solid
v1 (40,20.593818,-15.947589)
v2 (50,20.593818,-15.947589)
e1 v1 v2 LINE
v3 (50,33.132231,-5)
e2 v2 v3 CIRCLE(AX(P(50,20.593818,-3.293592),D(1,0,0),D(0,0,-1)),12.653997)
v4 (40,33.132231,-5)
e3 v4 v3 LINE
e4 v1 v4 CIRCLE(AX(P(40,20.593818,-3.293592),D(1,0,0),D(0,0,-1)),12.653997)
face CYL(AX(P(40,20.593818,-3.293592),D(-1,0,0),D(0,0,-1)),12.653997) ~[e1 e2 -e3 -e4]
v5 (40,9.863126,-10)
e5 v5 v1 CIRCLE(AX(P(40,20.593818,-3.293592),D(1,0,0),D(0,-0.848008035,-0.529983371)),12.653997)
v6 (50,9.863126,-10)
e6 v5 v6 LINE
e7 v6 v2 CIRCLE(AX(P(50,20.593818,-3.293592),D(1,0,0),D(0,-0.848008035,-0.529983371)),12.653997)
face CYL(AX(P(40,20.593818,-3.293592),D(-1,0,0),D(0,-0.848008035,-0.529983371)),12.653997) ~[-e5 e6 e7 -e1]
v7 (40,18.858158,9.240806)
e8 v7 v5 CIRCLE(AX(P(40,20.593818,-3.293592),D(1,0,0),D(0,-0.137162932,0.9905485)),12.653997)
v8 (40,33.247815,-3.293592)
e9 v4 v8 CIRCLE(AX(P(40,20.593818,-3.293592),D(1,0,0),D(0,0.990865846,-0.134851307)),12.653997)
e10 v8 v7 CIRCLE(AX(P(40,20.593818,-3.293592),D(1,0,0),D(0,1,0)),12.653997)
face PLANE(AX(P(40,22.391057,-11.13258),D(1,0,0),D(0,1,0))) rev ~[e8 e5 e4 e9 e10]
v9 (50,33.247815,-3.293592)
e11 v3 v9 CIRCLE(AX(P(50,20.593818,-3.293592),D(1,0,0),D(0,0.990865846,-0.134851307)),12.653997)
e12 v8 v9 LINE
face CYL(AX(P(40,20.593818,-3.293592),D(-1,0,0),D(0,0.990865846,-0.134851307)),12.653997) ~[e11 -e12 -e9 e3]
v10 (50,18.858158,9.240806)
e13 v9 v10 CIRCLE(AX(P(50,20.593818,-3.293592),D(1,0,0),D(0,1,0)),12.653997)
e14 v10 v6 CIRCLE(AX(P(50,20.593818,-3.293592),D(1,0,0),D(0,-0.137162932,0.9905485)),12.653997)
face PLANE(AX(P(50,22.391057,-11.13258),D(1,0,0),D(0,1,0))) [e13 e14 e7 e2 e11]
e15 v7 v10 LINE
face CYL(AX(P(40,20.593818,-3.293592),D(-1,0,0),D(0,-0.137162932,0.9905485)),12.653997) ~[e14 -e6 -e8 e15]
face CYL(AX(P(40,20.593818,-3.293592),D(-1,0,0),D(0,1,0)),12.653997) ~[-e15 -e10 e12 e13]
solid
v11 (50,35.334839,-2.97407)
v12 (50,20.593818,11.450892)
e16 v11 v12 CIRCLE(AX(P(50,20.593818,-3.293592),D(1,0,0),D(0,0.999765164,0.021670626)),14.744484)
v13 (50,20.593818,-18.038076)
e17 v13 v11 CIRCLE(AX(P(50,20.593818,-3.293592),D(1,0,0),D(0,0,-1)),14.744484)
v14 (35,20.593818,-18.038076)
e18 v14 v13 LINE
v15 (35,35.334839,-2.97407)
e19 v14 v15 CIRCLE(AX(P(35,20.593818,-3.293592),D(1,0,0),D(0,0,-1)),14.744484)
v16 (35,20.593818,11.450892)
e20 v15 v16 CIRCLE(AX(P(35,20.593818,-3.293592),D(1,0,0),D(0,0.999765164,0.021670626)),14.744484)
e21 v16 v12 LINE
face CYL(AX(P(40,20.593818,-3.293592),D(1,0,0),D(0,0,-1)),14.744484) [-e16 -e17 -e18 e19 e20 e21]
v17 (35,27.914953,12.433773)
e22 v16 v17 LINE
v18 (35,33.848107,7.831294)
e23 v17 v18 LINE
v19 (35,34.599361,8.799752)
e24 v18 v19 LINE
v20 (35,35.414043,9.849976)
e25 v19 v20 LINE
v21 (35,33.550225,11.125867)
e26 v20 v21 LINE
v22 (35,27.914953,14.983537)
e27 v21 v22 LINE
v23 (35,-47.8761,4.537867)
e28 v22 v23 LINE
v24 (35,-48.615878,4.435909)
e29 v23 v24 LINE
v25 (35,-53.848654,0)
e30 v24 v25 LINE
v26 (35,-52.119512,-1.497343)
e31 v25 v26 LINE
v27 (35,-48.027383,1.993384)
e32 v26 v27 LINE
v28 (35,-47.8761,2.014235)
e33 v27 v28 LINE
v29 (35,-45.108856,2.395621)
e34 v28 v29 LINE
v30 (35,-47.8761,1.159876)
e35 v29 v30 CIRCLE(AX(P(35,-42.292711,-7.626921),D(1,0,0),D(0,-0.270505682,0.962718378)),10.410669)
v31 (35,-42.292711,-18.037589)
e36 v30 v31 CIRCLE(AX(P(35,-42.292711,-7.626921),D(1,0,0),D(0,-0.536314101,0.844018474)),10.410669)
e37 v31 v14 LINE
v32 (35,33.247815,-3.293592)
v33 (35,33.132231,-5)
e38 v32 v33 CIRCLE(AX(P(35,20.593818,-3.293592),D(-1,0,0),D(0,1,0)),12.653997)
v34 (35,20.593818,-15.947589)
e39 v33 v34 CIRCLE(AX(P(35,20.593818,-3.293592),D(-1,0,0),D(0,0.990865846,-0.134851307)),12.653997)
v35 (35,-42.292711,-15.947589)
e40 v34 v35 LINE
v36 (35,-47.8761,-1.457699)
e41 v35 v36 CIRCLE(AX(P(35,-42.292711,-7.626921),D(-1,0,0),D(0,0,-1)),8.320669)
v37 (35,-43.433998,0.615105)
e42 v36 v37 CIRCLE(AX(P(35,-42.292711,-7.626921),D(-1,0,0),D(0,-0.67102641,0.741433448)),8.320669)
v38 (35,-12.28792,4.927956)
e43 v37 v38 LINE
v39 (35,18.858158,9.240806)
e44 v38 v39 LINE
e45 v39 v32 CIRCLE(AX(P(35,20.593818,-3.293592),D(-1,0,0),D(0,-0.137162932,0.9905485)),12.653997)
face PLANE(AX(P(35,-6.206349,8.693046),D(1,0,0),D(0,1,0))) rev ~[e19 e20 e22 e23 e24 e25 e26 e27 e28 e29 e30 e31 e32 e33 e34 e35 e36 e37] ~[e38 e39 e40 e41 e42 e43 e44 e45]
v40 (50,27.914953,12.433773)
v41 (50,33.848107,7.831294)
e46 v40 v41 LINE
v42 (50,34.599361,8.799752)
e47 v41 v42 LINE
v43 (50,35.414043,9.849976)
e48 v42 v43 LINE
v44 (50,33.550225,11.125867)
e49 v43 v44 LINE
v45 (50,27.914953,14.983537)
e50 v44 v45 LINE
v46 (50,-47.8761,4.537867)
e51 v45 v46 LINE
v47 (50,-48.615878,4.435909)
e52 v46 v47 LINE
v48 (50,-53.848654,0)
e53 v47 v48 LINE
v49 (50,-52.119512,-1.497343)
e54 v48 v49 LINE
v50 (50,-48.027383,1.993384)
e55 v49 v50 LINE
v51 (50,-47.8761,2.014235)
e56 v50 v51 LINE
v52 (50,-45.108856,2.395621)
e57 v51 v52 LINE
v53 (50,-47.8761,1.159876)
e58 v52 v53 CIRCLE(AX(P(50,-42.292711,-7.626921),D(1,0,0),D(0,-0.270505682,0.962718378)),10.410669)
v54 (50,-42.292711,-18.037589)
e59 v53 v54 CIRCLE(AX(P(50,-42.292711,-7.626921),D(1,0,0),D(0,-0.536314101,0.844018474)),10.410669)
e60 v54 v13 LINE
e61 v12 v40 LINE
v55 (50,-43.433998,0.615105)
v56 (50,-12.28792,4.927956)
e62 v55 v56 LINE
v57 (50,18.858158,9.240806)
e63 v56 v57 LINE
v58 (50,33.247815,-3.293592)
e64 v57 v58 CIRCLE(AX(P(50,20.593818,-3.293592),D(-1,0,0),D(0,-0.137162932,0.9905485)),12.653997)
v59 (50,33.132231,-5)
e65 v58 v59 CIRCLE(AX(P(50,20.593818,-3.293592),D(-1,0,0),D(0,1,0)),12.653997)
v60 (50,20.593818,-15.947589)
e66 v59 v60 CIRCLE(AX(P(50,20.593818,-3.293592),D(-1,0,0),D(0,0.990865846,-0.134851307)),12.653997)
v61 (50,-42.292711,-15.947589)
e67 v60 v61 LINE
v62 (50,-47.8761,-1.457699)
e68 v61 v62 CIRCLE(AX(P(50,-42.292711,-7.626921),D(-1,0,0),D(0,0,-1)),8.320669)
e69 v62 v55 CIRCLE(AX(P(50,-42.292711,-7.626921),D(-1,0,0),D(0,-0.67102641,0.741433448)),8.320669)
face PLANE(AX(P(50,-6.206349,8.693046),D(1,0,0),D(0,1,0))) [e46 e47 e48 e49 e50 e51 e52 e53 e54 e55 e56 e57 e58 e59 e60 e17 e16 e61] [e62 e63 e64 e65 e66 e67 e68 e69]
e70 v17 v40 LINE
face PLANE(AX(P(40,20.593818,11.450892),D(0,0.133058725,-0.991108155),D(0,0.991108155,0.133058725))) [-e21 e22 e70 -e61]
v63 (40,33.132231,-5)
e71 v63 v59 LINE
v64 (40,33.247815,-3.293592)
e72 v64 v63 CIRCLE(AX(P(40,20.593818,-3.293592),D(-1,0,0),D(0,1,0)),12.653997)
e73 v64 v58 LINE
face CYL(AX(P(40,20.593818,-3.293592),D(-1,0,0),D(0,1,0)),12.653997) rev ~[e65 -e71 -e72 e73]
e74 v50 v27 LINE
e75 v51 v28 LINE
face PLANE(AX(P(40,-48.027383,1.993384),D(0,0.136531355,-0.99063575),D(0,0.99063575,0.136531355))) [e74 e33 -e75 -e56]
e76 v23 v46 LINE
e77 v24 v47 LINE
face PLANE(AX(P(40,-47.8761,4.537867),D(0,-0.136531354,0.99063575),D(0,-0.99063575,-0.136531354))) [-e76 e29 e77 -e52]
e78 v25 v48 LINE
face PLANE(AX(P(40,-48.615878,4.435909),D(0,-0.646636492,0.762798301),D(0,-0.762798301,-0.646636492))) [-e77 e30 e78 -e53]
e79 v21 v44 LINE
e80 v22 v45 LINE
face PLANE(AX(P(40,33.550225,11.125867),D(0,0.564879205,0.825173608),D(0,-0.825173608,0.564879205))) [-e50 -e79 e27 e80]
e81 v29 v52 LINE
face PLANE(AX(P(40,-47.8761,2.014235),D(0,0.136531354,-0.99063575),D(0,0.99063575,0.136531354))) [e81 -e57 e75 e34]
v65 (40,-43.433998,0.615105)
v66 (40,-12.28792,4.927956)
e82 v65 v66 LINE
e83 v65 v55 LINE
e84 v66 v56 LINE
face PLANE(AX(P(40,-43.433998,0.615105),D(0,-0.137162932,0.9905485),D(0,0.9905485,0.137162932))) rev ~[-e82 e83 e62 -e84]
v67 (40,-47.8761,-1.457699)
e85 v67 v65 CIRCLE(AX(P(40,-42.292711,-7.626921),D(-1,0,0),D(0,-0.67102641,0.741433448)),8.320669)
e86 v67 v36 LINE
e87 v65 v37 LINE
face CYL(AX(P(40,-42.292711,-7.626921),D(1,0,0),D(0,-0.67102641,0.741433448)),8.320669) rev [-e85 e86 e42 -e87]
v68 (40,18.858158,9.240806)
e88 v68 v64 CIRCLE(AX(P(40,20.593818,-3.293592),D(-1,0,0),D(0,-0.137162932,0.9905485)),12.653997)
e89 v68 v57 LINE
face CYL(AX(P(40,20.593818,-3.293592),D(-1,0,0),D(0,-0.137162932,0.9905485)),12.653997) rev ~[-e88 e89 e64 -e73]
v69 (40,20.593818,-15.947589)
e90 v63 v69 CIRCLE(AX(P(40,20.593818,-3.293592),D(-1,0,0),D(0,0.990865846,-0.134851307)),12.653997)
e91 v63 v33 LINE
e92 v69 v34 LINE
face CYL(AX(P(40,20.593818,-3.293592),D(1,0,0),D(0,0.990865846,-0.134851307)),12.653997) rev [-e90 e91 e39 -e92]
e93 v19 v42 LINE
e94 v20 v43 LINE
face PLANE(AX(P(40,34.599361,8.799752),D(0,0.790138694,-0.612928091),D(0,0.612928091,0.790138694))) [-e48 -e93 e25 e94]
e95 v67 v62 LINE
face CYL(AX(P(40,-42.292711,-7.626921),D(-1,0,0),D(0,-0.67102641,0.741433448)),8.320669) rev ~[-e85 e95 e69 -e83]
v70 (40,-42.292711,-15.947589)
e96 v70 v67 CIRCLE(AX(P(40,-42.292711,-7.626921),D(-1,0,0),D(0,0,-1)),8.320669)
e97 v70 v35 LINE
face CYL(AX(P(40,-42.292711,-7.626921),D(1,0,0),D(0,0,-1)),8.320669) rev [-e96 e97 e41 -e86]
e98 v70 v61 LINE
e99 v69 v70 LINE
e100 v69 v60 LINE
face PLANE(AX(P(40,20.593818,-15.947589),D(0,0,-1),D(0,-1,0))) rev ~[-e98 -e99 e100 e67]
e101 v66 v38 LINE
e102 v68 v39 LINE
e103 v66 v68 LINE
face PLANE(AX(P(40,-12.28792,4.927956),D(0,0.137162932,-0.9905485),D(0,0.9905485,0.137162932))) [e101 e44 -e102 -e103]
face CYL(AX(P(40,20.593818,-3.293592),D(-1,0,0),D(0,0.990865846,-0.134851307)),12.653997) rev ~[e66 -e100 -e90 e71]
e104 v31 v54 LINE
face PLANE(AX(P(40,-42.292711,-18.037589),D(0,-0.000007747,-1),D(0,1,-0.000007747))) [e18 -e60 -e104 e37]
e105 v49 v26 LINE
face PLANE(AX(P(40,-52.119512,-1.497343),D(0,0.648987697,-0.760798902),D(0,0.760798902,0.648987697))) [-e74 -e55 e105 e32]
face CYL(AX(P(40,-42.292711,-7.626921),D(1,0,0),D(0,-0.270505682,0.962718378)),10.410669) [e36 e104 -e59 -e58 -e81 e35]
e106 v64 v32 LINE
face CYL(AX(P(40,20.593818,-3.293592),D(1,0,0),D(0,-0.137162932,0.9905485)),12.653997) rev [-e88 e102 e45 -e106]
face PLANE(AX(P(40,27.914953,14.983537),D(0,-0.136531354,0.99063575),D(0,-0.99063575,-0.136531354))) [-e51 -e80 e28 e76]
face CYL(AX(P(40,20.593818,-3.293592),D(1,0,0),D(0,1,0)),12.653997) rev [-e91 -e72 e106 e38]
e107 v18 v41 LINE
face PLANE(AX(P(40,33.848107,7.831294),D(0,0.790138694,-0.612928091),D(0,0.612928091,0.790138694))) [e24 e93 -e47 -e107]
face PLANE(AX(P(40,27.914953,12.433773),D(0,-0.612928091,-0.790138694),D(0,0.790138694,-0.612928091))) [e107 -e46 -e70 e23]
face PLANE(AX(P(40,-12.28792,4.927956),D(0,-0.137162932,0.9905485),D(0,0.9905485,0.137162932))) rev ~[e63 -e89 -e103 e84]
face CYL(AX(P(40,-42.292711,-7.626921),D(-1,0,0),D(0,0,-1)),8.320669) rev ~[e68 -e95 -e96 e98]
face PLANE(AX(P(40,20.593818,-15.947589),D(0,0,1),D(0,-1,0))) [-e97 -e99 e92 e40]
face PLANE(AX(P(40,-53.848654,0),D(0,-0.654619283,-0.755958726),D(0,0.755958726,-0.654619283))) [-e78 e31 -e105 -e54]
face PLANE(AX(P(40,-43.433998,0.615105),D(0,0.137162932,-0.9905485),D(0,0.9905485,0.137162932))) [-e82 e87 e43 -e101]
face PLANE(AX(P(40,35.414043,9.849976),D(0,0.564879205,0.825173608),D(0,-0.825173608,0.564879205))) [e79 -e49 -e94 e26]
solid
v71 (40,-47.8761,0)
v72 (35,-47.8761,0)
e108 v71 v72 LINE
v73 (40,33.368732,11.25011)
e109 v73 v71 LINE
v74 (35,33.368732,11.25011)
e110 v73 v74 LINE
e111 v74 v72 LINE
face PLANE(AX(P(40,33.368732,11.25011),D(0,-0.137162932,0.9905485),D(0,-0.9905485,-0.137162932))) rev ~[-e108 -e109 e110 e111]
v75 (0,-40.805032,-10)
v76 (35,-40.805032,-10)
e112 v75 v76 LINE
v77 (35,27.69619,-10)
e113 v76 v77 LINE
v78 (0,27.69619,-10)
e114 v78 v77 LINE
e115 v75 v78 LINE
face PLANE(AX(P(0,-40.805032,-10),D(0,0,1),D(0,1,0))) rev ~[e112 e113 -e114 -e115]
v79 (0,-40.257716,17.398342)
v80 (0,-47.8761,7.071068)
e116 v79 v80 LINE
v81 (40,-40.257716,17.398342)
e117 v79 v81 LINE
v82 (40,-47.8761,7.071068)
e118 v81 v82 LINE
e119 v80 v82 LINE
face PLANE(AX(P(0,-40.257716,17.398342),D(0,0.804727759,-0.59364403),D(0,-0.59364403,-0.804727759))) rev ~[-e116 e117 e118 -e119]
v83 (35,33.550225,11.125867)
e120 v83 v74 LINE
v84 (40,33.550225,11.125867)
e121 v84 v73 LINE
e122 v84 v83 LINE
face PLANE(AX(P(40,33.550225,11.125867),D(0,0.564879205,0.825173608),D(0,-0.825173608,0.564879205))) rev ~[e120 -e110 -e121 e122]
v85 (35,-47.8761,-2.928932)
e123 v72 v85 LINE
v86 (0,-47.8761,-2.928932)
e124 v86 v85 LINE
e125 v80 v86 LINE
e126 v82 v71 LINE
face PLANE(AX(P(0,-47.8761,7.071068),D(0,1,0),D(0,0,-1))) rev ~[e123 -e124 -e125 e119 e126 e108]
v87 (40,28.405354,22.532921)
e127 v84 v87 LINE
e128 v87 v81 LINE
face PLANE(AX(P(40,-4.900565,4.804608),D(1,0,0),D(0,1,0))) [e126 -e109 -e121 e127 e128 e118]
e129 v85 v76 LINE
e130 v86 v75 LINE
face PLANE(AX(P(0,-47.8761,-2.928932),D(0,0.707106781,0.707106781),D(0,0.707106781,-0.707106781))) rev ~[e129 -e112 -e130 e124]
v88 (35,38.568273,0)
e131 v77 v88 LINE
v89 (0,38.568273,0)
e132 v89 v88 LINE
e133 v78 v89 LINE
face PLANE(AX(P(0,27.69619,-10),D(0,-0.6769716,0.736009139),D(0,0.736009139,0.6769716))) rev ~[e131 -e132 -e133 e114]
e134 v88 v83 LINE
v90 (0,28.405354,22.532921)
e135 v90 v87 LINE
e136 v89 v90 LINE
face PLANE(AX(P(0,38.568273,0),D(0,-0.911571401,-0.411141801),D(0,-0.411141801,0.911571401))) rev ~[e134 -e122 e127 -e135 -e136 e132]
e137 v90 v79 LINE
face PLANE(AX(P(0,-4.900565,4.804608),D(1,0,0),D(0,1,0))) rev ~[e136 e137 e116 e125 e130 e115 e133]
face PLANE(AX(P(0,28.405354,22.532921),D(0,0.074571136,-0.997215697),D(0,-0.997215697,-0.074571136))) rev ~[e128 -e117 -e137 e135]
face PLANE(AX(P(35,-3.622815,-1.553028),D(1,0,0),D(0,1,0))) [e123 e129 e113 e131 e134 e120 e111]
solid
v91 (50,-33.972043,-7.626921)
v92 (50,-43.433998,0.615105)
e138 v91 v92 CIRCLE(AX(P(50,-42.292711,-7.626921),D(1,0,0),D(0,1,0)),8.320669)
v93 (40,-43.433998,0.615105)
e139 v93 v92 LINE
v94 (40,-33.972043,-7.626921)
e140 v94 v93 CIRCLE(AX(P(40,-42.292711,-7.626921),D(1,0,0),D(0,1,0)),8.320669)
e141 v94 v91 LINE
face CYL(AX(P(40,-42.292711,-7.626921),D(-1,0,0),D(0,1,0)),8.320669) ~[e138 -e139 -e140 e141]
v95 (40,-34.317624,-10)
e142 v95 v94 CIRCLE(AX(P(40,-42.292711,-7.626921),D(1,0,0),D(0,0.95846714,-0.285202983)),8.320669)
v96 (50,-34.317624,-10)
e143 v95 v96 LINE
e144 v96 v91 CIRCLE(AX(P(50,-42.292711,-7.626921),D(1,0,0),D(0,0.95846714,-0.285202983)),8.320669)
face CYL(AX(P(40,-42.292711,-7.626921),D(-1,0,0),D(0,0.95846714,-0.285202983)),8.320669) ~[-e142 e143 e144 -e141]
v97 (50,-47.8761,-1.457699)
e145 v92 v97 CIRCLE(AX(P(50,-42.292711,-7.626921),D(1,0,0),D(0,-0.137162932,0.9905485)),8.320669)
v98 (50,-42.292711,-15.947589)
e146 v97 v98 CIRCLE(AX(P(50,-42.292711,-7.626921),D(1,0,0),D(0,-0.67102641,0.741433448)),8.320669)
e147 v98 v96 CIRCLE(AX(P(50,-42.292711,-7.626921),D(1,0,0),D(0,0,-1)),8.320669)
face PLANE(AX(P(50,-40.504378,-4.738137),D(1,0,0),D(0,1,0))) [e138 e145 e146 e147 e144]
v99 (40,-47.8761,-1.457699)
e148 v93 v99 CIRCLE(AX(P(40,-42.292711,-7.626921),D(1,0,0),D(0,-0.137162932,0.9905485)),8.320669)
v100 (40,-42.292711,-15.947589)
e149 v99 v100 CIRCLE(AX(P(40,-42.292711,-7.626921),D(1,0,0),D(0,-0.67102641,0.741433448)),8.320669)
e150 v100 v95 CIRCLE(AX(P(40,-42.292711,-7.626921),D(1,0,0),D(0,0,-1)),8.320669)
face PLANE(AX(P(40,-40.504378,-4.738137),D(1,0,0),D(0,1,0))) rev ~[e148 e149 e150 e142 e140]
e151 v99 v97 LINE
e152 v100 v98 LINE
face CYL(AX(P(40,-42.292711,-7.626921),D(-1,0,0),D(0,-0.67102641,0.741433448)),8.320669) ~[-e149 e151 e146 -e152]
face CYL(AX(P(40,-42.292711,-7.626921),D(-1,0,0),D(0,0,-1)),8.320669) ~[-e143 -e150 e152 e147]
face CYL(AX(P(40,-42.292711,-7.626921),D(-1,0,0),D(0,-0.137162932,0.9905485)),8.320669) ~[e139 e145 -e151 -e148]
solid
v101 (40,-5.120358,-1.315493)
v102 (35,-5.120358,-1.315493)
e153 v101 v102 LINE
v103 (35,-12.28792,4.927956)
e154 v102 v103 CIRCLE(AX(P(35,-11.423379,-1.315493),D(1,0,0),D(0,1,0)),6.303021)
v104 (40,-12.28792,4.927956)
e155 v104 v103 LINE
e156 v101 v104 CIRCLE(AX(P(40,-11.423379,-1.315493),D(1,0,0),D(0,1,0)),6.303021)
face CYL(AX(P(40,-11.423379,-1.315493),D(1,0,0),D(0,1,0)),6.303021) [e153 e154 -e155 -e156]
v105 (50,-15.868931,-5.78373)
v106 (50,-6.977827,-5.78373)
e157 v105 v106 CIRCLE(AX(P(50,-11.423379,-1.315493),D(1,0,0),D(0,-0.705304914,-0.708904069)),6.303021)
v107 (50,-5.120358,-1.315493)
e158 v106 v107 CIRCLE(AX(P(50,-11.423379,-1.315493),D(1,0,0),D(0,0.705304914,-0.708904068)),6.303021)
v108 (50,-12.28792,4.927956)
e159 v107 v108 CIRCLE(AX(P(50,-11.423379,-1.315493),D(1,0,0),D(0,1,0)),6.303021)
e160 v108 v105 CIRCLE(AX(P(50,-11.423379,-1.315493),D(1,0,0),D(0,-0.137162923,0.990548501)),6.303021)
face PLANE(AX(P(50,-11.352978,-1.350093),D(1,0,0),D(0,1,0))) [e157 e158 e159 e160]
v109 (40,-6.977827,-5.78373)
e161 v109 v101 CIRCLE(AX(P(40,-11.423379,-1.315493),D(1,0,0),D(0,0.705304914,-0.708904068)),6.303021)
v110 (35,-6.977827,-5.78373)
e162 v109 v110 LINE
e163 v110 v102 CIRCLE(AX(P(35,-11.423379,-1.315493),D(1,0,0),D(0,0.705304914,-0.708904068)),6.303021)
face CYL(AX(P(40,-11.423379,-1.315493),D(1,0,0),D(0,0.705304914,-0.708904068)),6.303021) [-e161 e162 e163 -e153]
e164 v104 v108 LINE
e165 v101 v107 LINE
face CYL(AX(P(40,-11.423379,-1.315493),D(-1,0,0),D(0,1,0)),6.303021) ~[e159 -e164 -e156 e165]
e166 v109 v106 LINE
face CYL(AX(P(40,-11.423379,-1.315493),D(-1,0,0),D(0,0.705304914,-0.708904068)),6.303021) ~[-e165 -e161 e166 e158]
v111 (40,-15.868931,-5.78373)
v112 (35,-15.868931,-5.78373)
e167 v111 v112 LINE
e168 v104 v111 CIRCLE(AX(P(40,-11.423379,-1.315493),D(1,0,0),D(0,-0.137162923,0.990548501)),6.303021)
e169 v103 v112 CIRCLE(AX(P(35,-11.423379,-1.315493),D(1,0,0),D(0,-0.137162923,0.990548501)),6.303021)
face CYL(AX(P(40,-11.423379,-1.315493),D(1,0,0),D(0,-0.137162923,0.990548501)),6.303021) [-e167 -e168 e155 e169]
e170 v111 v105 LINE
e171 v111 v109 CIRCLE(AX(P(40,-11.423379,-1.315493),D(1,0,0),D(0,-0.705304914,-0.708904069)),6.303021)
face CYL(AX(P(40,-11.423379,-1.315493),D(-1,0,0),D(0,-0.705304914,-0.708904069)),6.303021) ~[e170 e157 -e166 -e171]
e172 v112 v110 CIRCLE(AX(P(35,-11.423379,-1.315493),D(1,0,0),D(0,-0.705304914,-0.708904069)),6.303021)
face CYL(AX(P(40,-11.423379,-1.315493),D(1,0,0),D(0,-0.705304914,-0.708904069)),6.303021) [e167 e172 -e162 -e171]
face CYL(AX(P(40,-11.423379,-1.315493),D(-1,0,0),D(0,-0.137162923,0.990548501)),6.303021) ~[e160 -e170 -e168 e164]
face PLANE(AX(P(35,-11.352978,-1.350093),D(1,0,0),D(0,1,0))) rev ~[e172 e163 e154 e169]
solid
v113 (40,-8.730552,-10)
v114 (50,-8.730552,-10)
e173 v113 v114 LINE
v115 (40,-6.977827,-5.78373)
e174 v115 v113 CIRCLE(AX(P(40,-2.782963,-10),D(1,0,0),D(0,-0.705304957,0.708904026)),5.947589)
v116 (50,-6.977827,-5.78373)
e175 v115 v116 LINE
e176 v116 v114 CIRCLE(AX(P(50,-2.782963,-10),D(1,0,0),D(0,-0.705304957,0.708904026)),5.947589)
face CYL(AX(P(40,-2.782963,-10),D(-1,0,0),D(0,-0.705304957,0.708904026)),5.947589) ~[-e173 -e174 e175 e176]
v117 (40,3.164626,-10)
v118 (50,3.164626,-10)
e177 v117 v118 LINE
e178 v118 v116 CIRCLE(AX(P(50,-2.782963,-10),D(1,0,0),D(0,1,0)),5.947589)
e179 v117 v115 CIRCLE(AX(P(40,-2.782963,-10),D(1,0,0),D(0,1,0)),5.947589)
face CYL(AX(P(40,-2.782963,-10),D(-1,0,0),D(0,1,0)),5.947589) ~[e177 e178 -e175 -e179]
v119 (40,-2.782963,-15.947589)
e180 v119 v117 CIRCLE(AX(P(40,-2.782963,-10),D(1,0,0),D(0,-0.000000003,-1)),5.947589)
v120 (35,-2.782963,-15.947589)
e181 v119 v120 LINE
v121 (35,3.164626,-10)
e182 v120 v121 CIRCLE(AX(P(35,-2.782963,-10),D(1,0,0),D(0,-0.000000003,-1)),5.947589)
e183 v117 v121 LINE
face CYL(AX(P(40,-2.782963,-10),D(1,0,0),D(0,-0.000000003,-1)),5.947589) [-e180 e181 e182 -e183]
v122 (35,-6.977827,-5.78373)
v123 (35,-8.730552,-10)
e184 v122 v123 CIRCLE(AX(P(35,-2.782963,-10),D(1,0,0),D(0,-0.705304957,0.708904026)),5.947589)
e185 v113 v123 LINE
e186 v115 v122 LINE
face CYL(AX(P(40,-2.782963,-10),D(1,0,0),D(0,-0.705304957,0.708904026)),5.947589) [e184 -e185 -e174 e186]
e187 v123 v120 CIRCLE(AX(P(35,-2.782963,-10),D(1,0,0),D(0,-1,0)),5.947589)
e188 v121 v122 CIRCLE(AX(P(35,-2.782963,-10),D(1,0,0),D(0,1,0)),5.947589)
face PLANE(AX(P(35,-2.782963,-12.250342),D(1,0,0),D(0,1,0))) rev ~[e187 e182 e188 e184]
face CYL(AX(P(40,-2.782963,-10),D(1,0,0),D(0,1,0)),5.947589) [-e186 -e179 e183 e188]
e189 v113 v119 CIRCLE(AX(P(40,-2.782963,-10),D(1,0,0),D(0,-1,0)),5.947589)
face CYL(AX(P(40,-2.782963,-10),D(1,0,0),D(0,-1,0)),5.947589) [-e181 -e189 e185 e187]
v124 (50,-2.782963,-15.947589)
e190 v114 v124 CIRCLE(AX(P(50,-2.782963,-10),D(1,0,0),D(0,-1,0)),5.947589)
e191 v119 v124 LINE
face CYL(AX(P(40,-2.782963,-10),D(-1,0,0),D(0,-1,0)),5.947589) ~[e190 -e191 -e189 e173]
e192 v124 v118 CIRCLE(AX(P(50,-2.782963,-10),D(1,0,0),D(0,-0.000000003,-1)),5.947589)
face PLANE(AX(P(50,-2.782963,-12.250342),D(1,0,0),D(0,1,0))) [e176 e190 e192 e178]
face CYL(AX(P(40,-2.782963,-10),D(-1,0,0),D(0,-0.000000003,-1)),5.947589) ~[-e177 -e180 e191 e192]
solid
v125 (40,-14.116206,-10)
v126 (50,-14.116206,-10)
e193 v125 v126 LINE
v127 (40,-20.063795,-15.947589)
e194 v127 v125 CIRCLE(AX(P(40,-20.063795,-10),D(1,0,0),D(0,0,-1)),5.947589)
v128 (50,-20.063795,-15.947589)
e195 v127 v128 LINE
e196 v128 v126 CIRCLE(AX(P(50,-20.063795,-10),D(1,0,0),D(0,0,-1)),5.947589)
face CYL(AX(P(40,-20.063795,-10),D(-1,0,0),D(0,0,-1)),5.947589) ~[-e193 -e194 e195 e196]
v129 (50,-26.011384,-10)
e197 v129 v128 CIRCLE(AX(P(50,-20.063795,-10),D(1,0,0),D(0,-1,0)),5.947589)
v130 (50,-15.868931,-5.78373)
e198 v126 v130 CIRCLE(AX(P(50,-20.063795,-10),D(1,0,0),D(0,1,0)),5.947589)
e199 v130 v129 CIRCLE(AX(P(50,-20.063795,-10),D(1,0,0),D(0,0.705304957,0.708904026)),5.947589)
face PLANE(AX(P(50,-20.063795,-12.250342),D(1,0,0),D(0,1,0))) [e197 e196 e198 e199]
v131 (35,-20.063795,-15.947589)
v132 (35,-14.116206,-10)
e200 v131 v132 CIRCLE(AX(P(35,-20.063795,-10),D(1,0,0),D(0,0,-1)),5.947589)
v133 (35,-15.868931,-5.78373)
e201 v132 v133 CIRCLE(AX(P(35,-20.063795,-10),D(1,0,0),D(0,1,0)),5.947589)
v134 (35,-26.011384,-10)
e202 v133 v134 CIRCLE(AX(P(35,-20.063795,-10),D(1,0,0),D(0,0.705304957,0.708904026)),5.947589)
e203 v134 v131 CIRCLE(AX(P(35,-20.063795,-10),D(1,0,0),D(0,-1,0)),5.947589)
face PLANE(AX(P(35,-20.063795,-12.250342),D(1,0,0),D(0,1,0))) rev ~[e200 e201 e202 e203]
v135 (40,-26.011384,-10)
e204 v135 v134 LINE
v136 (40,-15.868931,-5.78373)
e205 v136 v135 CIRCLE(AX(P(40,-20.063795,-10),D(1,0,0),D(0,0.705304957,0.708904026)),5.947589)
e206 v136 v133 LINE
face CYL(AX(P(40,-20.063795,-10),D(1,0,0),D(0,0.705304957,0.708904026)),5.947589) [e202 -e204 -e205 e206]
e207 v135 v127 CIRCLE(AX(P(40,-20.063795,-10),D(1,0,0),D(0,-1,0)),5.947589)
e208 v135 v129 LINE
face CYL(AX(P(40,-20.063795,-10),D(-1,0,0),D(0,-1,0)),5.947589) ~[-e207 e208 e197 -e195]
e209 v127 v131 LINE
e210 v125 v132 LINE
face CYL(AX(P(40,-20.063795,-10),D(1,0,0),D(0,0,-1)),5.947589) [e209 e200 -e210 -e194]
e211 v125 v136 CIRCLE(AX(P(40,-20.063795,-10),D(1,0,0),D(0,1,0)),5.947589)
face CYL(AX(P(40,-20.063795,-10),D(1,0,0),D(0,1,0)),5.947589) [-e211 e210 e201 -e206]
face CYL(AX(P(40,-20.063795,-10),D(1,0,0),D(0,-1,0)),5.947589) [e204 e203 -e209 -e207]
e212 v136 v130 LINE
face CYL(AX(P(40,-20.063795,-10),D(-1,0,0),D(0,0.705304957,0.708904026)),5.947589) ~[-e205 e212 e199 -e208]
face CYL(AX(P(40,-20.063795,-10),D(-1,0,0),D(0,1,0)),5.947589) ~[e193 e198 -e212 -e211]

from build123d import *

# Parameters (mm, degrees)
F1_DEPTH      = 40
F3_DEPTH      = 10
F3_DEPTH_BACK = 5
F5_DEPTH      = 5
F6_DEPTH      = 10


# Not quite as in the source:
# - a feature of the source that left no trace in its solid (it failed there, or was rolled back) is left out


with BuildPart() as f1:
    # F0 (on Right) → F1 (new body)
    with BuildSketch(Plane.YZ):
        Polygon((27.6961897601, -10), (38.5682727188, 0), (28.4053542368, 22.532921263), (-40.2577161056, 17.3983419039), (-47.8760995143, 7.0710678119), (-47.8760995143, -2.9289321881), (-40.8050317025, -10), align=None)
    extrude(amount=F1_DEPTH)

    # F4 (on face) → F5 (cut)
    with BuildSketch(Plane.YZ.offset(40)):
        Polygon((33.5502247129, 11.1258671229), (33.3687316656, 11.2501096426), (-47.8760995143, 0), (-47.8760995143, -2.9289321881), (-40.8050317025, -10), (27.6961897601, -10), (38.5682727188, 0), align=None)
    extrude(amount=-F5_DEPTH, mode=Mode.SUBTRACT)


with BuildPart() as f3:
    # F2 (on face) → F3 (new body, two sides)
    with BuildSketch(Plane.YZ.offset(40)) as f3_sk:
        with BuildLine():
            Line((-42.2927111518, 2.7837480747), (20.5938176628, 11.4508923365))
            Line((20.5938176628, 11.4508923365), (27.9149531109, 12.4337729067))
            Line((27.9149531109, 12.4337729067), (33.8481068611, 7.8312940896))
            Line((33.8481068611, 7.8312940896), (34.5993614092, 8.799752374))
            Line((34.5993614092, 8.799752374), (33.5502247129, 11.1258671229))
            Line((33.5502247129, 11.1258671229), (27.9149531109, 14.9835374473))
            Line((27.9149531109, 14.9835374473), (-47.8760995143, 4.5378665025))
            Line((-47.8760995143, 4.5378665025), (-47.8760995143, 2.0142345824))
            Line((-47.8760995143, 2.0142345824), (-45.1088561501, 2.3956214692))
            ThreePointArc((-45.1088561501, 2.3956214692), (-43.7140938337, 2.6862599718), (-42.2927111518, 2.7837480747))
        make_face()
        with BuildLine():
            ThreePointArc((18.8581583186, 9.2408059274), (28.9052740662, 6.2480712147), (33.2478147965, -3.2935919481))
            ThreePointArc((33.2478147965, -3.2935919481), (33.2188858392, -4.1487509974), (33.1322312395, -5))
            Line((33.1322312395, -5), (35.3348394178, -2.9740697466))
            ThreePointArc((35.3348394178, -2.9740697466), (30.9061555825, 7.2446955527), (20.5938176628, 11.4508923365))
            Line((20.5938176628, 11.4508923365), (-42.2927111518, 2.7837480747))
            Line((-42.2927111518, 2.7837480747), (-45.1088561501, 2.3956214692))
            ThreePointArc((-45.1088561501, 2.3956214692), (-46.5376854534, 1.8789836315), (-47.8760995143, 1.159876105))
            Line((-47.8760995143, 1.159876105), (-47.8760995143, -1.4576985119))
            ThreePointArc((-47.8760995143, -1.4576985119), (-45.8111546371, -0.0867559808), (-43.4339984475, 0.6151052728))
            Line((-43.4339984475, 0.6151052728), (-12.2879200079, 4.9279556079))
            Line((-12.2879200079, 4.9279556079), (18.8581583186, 9.2408059274))
        make_face()
        with BuildLine():
            Line((35.3348394178, -2.9740697466), (33.1322312395, -5))
            ThreePointArc((33.1322312395, -5), (28.9164002206, -12.8255520314), (20.5938176628, -15.9475890818))
            Line((20.5938176628, -15.9475890818), (-2.7829632369, -15.9475890818))
            Line((-2.7829632369, -15.9475890818), (-20.0637951493, -15.9475890818))
            Line((-20.0637951493, -15.9475890818), (-42.2927111518, -15.9475890818))
            ThreePointArc((-42.2927111518, -15.9475890818), (-50.056910311, -10.6186987382), (-47.8760995143, -1.4576985119))
            Line((-47.8760995143, -1.4576985119), (-47.8760995143, 1.159876105))
            ThreePointArc((-47.8760995143, 1.159876105), (-52.2891717155, -10.5342898377), (-42.2927111518, -18.0375890818))
            Line((-42.2927111518, -18.0375890818), (20.5938176628, -18.0380762327))
            ThreePointArc((20.5938176628, -18.0380762327), (31.1321051636, -13.6059298678), (35.3348394178, -2.9740697466))
        make_face()
        Polygon((-48.027382516, 1.9933844635), (-47.8760995143, 2.0142345824), (-47.8760995143, 4.5378665025), (-48.6158784645, 4.4359087223), (-53.8486540318, 0), (-52.1195121109, -1.4973431826), align=None)
        Polygon((33.5502247129, 11.1258671229), (34.5993614092, 8.799752374), (35.414042781, 9.8499755317), align=None)
        with BuildLine():
            Line((-45.1088561501, 2.3956214692), (-42.2927111518, 2.7837480747))
            ThreePointArc((-42.2927111518, 2.7837480747), (-43.7140938337, 2.6862599718), (-45.1088561501, 2.3956214692))
        make_face()
    extrude(amount=F3_DEPTH)
    extrude(f3_sk.sketch, amount=-F3_DEPTH_BACK)


with BuildPart() as f3b:
    # F2 (on face) → F3, piece 2 (new body, two sides)
    with BuildSketch(Plane.YZ.offset(40)) as f3_2_sk:
        with BuildLine():
            ThreePointArc((-5.1203578701, -1.3154927046), (-7.2833998095, 3.4372589676), (-12.2879200079, 4.9279556079))
            ThreePointArc((-12.2879200079, 4.9279556079), (-17.401198533, 0.6829450567), (-15.8689310869, -5.7837301576))
            ThreePointArc((-15.8689310869, -5.7837301576), (-11.4233791809, -7.6185140173), (-6.9778272761, -5.783730155))
            ThreePointArc((-6.9778272761, -5.783730155), (-5.603220848, -3.7349626107), (-5.1203578701, -1.3154927046))
        make_face()
    extrude(amount=F3_DEPTH)
    extrude(f3_2_sk.sketch, amount=-F3_DEPTH_BACK)


with BuildPart() as f3c:
    # F2 (on face) → F3, piece 3 (new body, two sides)
    with BuildSketch(Plane.YZ.offset(40)) as f3_3_sk:
        with BuildLine():
            ThreePointArc((-2.7829632369, -15.9475890818), (1.4226173479, -14.2055805787), (3.1646258655, -10))
            Line((3.1646258655, -10), (-8.7305522981, -10))
            ThreePointArc((-8.7305522981, -10), (-6.988543795, -14.2055805642), (-2.7829632369, -15.9475890818))
        make_face()
        with BuildLine():
            Line((-8.7305522981, -10), (3.1646258655, -10))
            ThreePointArc((3.1646258655, -10), (-0.4999292476, -4.5080448123), (-6.9778272761, -5.783730155))
            ThreePointArc((-6.9778272761, -5.783730155), (-8.274918404, -7.7169660313), (-8.7305522981, -10))
        make_face()
    extrude(amount=F3_DEPTH)
    extrude(f3_3_sk.sketch, amount=-F3_DEPTH_BACK)


with BuildPart() as f3d:
    # F2 (on face) → F3, piece 4 (new body, two sides)
    with BuildSketch(Plane.YZ.offset(40)) as f3_4_sk:
        with BuildLine():
            ThreePointArc((-20.0637951493, -15.9475890818), (-15.8582145779, -14.2055805715), (-14.1162060675, -10))
            Line((-14.1162060675, -10), (-26.0113842311, -10))
            ThreePointArc((-26.0113842311, -10), (-24.2693757208, -14.2055805715), (-20.0637951493, -15.9475890818))
        make_face()
        with BuildLine():
            ThreePointArc((-14.1162060675, -10), (-14.5718399609, -7.7169660331), (-15.8689310869, -5.7837301576))
            ThreePointArc((-15.8689310869, -5.7837301576), (-22.3468291163, -4.5080448116), (-26.0113842311, -10))
            Line((-26.0113842311, -10), (-14.1162060675, -10))
        make_face()
    extrude(amount=F3_DEPTH)
    extrude(f3_4_sk.sketch, amount=-F3_DEPTH_BACK)


with BuildPart() as f6:
    # F2 (on face) → F6 (new body)
    with BuildSketch(Plane.YZ.offset(40)):
        with BuildLine():
            ThreePointArc((-33.9720425736, -7.6269205036), (-36.8274914742, -1.3527751861), (-43.4339984475, 0.6151052728))
            ThreePointArc((-43.4339984475, 0.6151052728), (-45.8111546371, -0.0867559808), (-47.8760995143, -1.4576985119))
            Line((-47.8760995143, -1.4576985119), (-47.8760995143, -2.9289321881))
            Line((-47.8760995143, -2.9289321881), (-40.8050317025, -10))
            Line((-40.8050317025, -10), (-34.3176237359, -10))
            ThreePointArc((-34.3176237359, -10), (-34.0588911131, -8.8259756145), (-33.9720425736, -7.6269205036))
        make_face()
        with BuildLine():
            Line((-47.8760995143, -2.9289321881), (-47.8760995143, -1.4576985119))
            ThreePointArc((-47.8760995143, -1.4576985119), (-50.056910311, -10.6186987382), (-42.2927111518, -15.9475890818))
            ThreePointArc((-42.2927111518, -15.9475890818), (-37.3183811673, -14.296970488), (-34.3176237359, -10))
            Line((-34.3176237359, -10), (-40.8050317025, -10))
            Line((-40.8050317025, -10), (-47.8760995143, -2.9289321881))
        make_face()
    extrude(amount=F6_DEPTH)


with BuildPart() as f6b:
    # F2 (on face) → F6, piece 2 (new body)
    with BuildSketch(Plane.YZ.offset(40)):
        with BuildLine():
            ThreePointArc((20.5938176628, -15.9475890818), (28.9164002206, -12.8255520314), (33.1322312395, -5))
            Line((33.1322312395, -5), (27.6961897601, -10))
            Line((27.6961897601, -10), (9.8631264222, -10))
            ThreePointArc((9.8631264222, -10), (14.4594564412, -14.3612590854), (20.5938176628, -15.9475890818))
        make_face()
        with BuildLine():
            ThreePointArc((33.1322312395, -5), (33.2188858392, -4.1487509974), (33.2478147965, -3.2935919481))
            ThreePointArc((33.2478147965, -3.2935919481), (28.9052740662, 6.2480712147), (18.8581583186, 9.2408059274))
            ThreePointArc((18.8581583186, 9.2408059274), (9.1306319184, 2.0654206522), (9.8631264222, -10))
            Line((9.8631264222, -10), (27.6961897601, -10))
            Line((27.6961897601, -10), (33.1322312395, -5))
        make_face()
    extrude(amount=F6_DEPTH)


solid = Compound([f1.part, f3.part, f3b.part, f3c.part, f3d.part, f6.part, f6b.part])
